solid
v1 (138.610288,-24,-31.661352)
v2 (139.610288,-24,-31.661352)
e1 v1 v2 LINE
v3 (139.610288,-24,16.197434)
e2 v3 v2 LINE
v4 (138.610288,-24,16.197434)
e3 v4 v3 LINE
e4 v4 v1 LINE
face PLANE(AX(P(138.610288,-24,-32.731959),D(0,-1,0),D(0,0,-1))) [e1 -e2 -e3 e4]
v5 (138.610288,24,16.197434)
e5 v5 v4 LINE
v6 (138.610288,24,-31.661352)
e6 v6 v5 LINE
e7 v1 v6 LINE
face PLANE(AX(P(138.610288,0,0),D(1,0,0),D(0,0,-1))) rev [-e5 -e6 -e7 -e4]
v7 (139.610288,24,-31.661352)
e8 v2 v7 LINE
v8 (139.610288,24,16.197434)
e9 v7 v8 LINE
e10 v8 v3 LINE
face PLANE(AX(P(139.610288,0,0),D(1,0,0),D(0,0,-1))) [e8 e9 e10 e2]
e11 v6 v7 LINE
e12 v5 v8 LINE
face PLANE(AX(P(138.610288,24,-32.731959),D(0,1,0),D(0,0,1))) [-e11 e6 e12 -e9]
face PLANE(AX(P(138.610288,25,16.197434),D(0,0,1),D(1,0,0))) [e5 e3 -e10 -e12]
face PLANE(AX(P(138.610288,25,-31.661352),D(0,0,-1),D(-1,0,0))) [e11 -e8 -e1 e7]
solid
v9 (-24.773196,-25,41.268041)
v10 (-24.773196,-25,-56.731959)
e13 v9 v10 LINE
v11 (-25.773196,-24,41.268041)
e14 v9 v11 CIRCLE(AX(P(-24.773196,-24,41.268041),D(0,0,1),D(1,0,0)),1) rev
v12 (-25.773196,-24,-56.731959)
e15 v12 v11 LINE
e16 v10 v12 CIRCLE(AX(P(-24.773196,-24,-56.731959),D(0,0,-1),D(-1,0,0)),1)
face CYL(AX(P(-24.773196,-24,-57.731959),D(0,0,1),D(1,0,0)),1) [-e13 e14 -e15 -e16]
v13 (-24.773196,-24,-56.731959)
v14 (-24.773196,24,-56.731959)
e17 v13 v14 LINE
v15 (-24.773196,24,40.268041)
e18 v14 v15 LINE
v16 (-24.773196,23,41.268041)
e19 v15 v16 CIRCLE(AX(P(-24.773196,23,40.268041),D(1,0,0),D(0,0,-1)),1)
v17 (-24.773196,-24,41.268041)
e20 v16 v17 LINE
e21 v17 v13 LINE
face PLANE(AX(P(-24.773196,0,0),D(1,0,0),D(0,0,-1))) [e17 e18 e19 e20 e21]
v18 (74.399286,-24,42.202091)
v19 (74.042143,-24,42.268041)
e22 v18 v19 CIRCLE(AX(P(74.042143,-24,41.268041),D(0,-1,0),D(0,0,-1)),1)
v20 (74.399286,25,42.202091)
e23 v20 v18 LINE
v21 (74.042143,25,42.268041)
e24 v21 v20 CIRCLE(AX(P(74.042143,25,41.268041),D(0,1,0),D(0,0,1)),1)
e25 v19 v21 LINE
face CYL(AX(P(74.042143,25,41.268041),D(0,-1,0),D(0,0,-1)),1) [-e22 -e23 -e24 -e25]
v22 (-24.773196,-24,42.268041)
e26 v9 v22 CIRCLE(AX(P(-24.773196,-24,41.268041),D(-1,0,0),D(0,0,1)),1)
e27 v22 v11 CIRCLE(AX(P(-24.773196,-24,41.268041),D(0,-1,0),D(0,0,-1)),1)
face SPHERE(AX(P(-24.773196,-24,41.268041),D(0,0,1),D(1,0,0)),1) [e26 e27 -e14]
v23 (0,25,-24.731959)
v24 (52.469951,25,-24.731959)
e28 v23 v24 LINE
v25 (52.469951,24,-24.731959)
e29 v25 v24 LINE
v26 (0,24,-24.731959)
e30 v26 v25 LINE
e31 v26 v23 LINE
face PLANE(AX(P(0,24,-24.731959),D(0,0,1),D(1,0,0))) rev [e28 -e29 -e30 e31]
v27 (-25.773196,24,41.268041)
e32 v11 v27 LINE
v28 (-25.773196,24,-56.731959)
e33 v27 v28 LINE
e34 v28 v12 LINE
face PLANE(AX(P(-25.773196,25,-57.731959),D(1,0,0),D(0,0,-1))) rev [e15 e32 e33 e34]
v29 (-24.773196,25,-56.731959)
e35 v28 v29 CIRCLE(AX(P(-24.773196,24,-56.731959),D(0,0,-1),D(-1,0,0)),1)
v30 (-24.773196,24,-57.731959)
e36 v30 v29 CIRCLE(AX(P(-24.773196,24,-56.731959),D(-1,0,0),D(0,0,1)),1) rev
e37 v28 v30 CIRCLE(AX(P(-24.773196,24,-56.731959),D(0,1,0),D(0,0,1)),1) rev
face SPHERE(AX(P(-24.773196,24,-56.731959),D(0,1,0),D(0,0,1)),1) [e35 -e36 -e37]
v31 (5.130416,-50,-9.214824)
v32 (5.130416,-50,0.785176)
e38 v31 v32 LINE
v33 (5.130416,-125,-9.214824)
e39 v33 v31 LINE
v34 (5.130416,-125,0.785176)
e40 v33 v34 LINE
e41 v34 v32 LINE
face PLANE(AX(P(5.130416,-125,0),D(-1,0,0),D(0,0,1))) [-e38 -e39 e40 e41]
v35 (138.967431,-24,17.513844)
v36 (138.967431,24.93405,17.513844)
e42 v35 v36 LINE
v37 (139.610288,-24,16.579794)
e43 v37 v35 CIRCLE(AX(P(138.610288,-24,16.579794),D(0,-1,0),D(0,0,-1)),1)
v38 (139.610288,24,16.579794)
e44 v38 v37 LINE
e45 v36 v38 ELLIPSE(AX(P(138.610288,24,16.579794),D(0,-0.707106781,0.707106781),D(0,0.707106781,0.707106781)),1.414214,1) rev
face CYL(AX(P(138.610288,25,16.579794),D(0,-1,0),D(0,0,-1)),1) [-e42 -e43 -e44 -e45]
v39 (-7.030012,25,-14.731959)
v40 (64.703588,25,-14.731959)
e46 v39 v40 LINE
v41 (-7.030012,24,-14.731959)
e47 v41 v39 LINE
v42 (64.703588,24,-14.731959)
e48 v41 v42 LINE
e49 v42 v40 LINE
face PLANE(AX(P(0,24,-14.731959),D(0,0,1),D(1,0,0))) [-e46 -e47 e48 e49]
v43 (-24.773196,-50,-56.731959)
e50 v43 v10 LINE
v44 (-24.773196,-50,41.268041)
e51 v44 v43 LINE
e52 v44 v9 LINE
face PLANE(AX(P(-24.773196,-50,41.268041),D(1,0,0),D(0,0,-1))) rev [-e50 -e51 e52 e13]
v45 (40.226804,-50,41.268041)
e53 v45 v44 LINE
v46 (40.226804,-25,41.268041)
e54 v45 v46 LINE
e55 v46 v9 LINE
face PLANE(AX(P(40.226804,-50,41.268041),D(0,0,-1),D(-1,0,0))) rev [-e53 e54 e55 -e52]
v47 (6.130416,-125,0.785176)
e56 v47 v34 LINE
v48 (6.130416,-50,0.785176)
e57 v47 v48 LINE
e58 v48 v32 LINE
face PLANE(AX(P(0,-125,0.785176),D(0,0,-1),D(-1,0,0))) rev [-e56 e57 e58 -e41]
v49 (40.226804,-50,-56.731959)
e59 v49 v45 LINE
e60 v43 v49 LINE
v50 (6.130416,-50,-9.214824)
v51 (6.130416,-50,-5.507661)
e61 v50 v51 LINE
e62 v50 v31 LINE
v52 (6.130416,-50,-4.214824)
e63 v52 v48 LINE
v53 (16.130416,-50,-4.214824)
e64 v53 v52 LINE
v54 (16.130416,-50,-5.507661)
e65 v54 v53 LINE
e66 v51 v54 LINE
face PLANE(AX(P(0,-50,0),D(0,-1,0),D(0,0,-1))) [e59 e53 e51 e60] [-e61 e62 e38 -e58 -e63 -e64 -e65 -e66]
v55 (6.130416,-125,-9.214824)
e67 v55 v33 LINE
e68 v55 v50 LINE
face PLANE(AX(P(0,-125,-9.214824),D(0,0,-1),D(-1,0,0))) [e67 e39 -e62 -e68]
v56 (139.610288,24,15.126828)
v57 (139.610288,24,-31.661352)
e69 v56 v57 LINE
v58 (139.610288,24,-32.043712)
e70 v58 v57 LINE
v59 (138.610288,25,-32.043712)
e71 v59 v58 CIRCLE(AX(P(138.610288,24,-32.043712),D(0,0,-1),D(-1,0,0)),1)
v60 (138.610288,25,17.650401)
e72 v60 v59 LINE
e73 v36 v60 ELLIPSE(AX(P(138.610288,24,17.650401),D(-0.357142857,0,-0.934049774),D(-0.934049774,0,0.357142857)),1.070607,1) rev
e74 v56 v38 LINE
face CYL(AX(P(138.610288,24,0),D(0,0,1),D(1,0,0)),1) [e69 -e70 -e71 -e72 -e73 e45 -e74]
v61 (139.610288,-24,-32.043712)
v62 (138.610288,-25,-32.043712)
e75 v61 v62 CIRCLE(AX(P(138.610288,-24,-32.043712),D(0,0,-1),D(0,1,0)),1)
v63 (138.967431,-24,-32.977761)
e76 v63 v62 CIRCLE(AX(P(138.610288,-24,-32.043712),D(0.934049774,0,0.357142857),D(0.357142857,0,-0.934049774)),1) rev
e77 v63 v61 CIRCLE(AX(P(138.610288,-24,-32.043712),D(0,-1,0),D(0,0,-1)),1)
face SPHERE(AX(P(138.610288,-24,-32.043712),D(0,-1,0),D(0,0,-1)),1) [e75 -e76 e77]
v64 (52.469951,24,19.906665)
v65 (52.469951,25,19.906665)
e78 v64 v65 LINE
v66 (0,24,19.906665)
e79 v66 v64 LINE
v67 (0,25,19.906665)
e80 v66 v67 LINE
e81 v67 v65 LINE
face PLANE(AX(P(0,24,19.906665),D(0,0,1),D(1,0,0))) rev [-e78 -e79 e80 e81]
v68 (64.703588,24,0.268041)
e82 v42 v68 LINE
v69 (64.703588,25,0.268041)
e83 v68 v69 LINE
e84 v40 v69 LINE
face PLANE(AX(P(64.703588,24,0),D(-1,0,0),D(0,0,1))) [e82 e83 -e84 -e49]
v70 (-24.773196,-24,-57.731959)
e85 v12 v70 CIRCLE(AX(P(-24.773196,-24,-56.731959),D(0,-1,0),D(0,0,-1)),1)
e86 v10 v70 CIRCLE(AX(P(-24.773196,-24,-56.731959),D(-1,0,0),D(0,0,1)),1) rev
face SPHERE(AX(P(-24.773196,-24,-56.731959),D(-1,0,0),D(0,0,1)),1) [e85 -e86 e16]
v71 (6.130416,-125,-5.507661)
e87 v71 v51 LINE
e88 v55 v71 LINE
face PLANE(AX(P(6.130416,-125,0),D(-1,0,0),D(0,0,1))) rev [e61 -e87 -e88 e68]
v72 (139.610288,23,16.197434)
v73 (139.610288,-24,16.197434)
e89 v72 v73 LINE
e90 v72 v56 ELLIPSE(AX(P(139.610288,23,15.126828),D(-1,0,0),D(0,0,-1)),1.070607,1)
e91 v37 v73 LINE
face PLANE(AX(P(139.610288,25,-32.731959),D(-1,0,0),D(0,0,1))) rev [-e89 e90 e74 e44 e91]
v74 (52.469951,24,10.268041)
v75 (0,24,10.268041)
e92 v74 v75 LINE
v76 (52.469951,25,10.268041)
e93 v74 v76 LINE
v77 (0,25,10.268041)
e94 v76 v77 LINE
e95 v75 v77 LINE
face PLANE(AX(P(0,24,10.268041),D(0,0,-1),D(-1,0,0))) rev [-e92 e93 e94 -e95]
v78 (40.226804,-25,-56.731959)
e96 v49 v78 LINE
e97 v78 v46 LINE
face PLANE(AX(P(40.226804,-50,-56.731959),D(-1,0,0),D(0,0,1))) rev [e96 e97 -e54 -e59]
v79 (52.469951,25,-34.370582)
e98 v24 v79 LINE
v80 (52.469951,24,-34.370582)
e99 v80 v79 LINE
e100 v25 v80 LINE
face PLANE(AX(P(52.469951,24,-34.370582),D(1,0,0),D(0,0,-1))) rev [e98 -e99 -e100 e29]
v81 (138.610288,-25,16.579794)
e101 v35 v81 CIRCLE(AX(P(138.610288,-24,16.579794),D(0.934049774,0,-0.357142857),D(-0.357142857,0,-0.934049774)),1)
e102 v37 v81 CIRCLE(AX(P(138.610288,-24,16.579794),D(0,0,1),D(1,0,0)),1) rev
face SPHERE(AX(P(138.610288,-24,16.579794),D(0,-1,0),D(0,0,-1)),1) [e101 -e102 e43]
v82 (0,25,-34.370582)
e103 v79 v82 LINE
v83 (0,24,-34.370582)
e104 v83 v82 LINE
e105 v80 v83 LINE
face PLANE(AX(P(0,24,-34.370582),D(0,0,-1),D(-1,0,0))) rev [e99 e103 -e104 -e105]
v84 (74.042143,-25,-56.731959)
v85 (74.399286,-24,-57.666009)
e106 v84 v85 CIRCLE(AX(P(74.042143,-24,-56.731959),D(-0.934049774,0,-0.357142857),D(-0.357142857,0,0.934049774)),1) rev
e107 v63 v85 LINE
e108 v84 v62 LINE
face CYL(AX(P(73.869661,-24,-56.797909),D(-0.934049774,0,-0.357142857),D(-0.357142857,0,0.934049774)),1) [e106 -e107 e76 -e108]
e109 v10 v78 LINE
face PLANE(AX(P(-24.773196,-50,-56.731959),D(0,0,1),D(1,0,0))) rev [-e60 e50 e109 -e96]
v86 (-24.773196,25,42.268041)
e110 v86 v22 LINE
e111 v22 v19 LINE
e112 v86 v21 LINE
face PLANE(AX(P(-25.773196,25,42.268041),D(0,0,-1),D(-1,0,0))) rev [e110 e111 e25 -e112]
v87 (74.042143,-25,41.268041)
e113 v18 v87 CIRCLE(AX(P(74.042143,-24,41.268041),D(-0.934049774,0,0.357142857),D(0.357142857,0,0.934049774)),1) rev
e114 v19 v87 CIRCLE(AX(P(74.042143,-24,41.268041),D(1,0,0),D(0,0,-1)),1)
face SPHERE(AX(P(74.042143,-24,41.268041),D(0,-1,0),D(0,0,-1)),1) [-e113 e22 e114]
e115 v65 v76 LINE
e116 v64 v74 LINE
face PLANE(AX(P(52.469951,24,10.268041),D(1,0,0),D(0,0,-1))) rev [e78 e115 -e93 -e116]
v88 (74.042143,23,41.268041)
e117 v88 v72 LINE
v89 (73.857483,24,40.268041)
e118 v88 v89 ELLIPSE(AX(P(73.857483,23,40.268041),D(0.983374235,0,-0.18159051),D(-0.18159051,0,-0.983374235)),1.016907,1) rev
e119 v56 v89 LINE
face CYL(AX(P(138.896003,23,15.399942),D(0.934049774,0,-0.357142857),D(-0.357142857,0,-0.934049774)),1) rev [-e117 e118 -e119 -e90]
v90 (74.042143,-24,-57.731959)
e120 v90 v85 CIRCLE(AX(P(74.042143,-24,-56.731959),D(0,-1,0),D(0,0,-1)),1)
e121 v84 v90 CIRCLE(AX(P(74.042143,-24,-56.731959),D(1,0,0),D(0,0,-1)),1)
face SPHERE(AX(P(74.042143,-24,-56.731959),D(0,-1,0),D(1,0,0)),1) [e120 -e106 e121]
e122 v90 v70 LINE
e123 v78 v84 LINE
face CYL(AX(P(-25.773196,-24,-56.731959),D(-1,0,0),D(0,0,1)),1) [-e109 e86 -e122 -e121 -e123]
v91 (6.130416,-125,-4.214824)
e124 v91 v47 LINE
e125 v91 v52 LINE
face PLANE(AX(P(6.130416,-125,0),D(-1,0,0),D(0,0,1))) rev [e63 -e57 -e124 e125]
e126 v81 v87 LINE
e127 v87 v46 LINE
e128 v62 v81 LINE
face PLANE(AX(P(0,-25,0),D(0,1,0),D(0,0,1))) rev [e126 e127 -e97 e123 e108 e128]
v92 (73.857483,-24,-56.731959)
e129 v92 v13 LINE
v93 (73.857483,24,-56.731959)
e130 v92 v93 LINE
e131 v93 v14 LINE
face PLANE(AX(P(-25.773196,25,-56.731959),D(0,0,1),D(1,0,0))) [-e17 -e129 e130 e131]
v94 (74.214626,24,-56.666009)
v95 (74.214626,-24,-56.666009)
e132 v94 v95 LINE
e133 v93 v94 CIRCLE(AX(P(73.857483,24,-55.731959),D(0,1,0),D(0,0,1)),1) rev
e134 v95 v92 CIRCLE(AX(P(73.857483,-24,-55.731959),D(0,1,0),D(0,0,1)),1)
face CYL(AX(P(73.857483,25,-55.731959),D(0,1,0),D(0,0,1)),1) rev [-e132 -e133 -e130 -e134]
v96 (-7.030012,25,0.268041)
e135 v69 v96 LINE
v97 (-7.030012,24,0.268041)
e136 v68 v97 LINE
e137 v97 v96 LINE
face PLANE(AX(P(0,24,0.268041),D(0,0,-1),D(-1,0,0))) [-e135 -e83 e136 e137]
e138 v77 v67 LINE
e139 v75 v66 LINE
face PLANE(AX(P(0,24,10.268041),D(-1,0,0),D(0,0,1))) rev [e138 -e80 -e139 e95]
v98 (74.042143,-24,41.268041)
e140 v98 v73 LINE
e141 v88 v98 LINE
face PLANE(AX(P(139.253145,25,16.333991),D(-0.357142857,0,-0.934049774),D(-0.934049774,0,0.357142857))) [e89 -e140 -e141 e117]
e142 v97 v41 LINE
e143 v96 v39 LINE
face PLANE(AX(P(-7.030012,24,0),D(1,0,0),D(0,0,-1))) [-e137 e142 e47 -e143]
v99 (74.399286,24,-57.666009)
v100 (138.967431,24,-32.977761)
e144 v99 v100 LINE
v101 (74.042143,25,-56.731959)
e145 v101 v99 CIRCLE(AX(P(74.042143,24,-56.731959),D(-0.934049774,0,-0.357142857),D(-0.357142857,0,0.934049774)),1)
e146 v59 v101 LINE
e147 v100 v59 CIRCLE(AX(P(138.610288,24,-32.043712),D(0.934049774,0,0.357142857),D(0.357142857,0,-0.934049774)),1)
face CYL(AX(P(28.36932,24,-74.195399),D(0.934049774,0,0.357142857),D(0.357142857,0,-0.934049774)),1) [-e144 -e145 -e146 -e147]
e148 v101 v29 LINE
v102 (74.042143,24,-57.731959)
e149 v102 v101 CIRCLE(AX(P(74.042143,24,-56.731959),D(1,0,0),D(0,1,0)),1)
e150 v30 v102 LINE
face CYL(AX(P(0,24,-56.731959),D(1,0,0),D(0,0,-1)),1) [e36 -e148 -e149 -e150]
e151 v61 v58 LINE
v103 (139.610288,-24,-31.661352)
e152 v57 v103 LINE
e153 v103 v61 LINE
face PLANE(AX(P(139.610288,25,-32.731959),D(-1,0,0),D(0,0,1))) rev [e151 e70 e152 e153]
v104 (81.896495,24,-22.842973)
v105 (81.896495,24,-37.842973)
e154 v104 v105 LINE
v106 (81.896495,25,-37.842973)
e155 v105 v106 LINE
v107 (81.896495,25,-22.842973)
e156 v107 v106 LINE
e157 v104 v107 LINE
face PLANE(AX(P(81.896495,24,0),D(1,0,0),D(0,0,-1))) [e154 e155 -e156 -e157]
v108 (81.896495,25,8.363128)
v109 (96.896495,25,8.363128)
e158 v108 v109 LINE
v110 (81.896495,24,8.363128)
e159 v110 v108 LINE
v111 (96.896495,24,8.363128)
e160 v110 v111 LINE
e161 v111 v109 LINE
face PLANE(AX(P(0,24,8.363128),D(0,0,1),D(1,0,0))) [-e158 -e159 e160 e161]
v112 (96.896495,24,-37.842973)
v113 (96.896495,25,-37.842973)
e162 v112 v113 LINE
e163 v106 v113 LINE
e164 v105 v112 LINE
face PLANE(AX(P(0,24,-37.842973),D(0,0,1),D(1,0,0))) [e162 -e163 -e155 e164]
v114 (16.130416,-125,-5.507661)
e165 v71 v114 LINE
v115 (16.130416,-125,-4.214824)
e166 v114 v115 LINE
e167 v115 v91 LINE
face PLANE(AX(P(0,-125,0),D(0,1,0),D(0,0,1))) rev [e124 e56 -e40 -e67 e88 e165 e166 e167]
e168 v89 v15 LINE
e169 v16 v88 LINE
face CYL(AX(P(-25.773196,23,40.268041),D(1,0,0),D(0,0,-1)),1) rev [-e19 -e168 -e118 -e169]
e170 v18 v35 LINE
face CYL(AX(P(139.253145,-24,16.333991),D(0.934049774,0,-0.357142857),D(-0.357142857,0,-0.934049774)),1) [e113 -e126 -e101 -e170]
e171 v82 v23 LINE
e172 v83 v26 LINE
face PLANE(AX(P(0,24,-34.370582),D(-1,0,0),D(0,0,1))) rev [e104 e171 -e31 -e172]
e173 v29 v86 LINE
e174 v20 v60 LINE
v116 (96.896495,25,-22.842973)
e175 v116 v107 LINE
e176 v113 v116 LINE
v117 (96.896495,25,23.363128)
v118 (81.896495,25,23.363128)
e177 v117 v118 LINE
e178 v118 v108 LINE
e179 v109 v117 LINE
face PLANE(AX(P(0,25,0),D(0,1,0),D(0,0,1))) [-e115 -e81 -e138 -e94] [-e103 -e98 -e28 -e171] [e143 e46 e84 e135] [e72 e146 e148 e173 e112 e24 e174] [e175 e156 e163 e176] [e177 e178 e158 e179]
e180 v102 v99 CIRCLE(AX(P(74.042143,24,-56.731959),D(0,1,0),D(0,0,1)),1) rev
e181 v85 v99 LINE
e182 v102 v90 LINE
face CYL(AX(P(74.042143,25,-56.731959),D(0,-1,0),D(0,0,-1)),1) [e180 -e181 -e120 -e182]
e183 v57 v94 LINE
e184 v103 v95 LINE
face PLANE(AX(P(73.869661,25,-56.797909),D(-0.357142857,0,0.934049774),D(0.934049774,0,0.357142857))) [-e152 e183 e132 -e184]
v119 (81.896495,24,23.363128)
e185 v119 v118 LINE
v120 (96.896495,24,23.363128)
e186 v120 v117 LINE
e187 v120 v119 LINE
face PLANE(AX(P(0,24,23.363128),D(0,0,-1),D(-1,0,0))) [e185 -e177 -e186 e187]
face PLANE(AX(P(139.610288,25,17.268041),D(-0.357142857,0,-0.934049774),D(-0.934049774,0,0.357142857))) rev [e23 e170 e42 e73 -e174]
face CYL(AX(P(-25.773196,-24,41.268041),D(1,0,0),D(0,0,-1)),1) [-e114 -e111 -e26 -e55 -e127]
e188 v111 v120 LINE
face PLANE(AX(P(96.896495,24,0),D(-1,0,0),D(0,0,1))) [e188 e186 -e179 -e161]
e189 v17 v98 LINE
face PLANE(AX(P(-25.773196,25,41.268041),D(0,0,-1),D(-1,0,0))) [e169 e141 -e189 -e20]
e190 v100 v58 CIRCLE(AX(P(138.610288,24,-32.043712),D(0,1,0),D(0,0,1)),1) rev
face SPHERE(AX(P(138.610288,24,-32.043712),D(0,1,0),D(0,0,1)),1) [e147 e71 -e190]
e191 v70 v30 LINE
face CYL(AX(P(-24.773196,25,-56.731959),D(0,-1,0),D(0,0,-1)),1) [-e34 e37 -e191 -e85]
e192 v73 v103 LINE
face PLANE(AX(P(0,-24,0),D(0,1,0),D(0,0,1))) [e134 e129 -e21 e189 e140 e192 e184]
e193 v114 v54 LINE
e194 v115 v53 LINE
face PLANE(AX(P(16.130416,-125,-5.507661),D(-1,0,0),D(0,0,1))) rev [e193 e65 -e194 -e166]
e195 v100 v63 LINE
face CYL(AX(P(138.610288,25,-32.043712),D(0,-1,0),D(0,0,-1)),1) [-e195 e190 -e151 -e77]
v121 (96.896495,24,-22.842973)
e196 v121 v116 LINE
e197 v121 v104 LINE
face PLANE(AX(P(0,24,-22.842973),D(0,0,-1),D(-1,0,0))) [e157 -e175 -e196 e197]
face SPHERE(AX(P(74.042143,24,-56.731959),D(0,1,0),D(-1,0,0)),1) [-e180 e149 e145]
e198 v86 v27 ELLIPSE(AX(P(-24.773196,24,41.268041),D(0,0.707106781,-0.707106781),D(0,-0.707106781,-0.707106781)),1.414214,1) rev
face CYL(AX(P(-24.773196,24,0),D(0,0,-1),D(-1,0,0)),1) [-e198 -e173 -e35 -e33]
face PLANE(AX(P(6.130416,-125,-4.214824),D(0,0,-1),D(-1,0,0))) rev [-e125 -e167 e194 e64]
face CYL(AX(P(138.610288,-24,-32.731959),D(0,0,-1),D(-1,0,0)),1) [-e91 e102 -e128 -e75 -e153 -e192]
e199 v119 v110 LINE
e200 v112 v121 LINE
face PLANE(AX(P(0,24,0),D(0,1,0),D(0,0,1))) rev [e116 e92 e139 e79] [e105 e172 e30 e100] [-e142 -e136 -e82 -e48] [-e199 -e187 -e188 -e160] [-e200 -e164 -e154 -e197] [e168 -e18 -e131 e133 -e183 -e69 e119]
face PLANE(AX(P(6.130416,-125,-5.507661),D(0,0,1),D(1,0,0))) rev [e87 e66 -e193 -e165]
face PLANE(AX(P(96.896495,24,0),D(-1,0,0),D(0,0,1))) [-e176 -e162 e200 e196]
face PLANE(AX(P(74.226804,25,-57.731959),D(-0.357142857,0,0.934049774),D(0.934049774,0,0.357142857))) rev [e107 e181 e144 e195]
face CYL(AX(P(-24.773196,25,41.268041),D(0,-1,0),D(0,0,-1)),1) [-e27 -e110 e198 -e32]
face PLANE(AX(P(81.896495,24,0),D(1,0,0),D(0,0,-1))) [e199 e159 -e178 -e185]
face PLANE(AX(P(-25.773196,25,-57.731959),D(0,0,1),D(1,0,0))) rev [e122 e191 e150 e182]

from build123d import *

# Parameters (mm, degrees)
BOSS_EXTRUDE1_DEPTH  = 25
SHELL1_T             = -1
BOSS_EXTRUDE5_START  = 139.610288
SKETCH2_W            = 47.858786484
SKETCH2_H            = 48
BOSS_EXTRUDE5_DEPTH  = 1
BOSS_EXTRUDE6_START  = -25.773196
SKETCH3_W            = 98
SKETCH3_H            = 48
BOSS_EXTRUDE6_DEPTH  = 1
FILLET1_R            = 1
CUT_EXTRUDE1_START   = 25
SKETCH4_W            = 71.73360049
SKETCH4_H            = 15
CUT_EXTRUDE1_DEPTH   = 1
CUT_EXTRUDE3_START   = 25
SKETCH5_W            = 15
SKETCH5_H            = 15
CUT_EXTRUDE3_DEPTH   = 1
SKETCH7_W            = 65
SKETCH7_H            = 98
BOSS_EXTRUDE8_DEPTH  = 25
BOSS_EXTRUDE10_START = 25
SKETCH6_W            = 1
SKETCH6_H            = 10
BOSS_EXTRUDE10_DEPTH = 75
SKETCH8_W            = 10
SKETCH8_H            = 1.292837184
BOSS_EXTRUDE11_DEPTH = 75
SKETCH9_W            = 52.469950821
SKETCH9_H            = 9.638623322
CUT_EXTRUDE4_DEPTH   = 1


with BuildPart() as part:
    # Sketch1 → Boss-Extrude1 (new, symmetric)
    with BuildSketch(Plane(origin=(0, 0, 0), x_dir=(1, 0, 0), z_dir=(0, 1, 0))):
        Polygon((74.226804124, 57.731958763), (139.610288277, 32.731958763), (139.610288277, -17.268041237), (74.226804124, -42.268041237), (-25.773195876, -42.268041237), (-25.773195876, 57.731958763), align=None)
    extrude(amount=BOSS_EXTRUDE1_DEPTH, both=True)

    # Shell1
    shell1_openings = [part.faces().sort_by_distance(p)[0] for p in [
        (139.610288277, 0, -7.731958763),
        (-25.773195876, 0, -7.731958763),
    ]]
    offset(amount=SHELL1_T, openings=shell1_openings, kind=Kind.INTERSECTION)

    # Sketch3 → Boss-Extrude6 (add)
    with BuildSketch(Plane(origin=(0, 0, 0), x_dir=(0, 0, -1), z_dir=(1, 0, 0)).offset(BOSS_EXTRUDE6_START)):
        with Locations((7.731958763, 0)):
            Rectangle(SKETCH3_W, SKETCH3_H)
    extrude(amount=BOSS_EXTRUDE6_DEPTH)

    # Fillet1
    fillet1_edges = [part.edges().sort_by_distance(p)[0] for p in [
        (-25.773195876, 0, -57.731958763),
        (74.226804124, 0, -57.731958763),
        (139.610288277, 0, -32.731958763),
        (139.610288277, 0, 17.268041237),
        (74.226804124, 0, 42.268041237),
        (-25.773195876, 0, 42.268041237),
        (139.610288277, 25, -7.731958763),
        (106.9185462, 25, -45.231958763),
        (74.04214349, 0, -56.731958763),
        (24.226804124, 25, -57.731958763),
        (106.826215883, 24, 28.732737858),
        (24.634473745, 24, 41.268041237),
        (-25.773195876, 25, -7.731958763),
        (24.226804124, -25, -57.731958763),
        (106.9185462, -25, -45.231958763),
        (139.610288277, -25, -7.731958763),
        (106.9185462, -25, 29.768041237),
        (24.226804124, -25, 42.268041237),
        (-25.773195876, -25, -7.731958763),
    ]]
    fillet(fillet1_edges, radius=FILLET1_R - 0.0001)  # a hair under: the kernel refuses the full size

    # Sketch4 → Cut-Extrude1 (cut)
    with BuildSketch(Plane(origin=(0, 0, 0), x_dir=(1, 0, 0), z_dir=(0, 1, 0)).offset(CUT_EXTRUDE1_START)):
        with Locations((28.836787869, 7.231958763)):
            Rectangle(SKETCH4_W, SKETCH4_H)
    extrude(amount=-CUT_EXTRUDE1_DEPTH, mode=Mode.SUBTRACT)

    # Sketch5 → Cut-Extrude3 (cut)
    with BuildSketch(Plane(origin=(0, 0, 0), x_dir=(1, 0, 0), z_dir=(0, 1, 0)).offset(CUT_EXTRUDE3_START)):
        with Locations((89.396495287, 30.342973194)):
            Rectangle(SKETCH5_W, SKETCH5_H)
        with Locations((89.396495287, -15.863127894)):
            Rectangle(SKETCH5_W, SKETCH5_H)
    extrude(amount=-CUT_EXTRUDE3_DEPTH, mode=Mode.SUBTRACT)

    # Sketch7 → Boss-Extrude8 (add)
    with BuildSketch(Plane.XZ.offset(25)):
        with Locations((7.726804124, -7.731958763)):
            Rectangle(SKETCH7_W, SKETCH7_H)
    extrude(amount=BOSS_EXTRUDE8_DEPTH)

    # Sketch6 → Boss-Extrude10 (add)
    with BuildSketch(Plane.XZ.offset(25).offset(BOSS_EXTRUDE10_START)):
        with Locations((5.630415621, -4.214823889)):
            Rectangle(SKETCH6_W, SKETCH6_H)
    extrude(amount=BOSS_EXTRUDE10_DEPTH)

    # Sketch8 → Boss-Extrude11 (add)
    with BuildSketch(Plane.XZ.offset(50)):
        with Locations((11.130415621, -4.861242481)):
            Rectangle(SKETCH8_W, SKETCH8_H)
    extrude(amount=BOSS_EXTRUDE11_DEPTH)

    # Sketch9 → Cut-Extrude4 (cut)
    with BuildSketch(Plane(origin=(0, 25, 0), x_dir=(1, 0, 0), z_dir=(0, 1, 0))):
        with Locations((26.234975411, 29.551270424)):
            Rectangle(SKETCH9_W, SKETCH9_H)
        with Locations((26.234975411, -15.087352898)):
            Rectangle(SKETCH9_W, SKETCH9_H)
    extrude(amount=-CUT_EXTRUDE4_DEPTH, mode=Mode.SUBTRACT)


with BuildPart() as body_2:
    # Sketch2 → Boss-Extrude5 (new body)
    with BuildSketch(Plane(origin=(0, 0, 0), x_dir=(0, 0, -1), z_dir=(1, 0, 0)).offset(BOSS_EXTRUDE5_START)):
        with Locations((7.731958763, 0)):
            Rectangle(SKETCH2_W, SKETCH2_H)
    extrude(amount=-BOSS_EXTRUDE5_DEPTH)


solid = Compound([part.part, body_2.part])
